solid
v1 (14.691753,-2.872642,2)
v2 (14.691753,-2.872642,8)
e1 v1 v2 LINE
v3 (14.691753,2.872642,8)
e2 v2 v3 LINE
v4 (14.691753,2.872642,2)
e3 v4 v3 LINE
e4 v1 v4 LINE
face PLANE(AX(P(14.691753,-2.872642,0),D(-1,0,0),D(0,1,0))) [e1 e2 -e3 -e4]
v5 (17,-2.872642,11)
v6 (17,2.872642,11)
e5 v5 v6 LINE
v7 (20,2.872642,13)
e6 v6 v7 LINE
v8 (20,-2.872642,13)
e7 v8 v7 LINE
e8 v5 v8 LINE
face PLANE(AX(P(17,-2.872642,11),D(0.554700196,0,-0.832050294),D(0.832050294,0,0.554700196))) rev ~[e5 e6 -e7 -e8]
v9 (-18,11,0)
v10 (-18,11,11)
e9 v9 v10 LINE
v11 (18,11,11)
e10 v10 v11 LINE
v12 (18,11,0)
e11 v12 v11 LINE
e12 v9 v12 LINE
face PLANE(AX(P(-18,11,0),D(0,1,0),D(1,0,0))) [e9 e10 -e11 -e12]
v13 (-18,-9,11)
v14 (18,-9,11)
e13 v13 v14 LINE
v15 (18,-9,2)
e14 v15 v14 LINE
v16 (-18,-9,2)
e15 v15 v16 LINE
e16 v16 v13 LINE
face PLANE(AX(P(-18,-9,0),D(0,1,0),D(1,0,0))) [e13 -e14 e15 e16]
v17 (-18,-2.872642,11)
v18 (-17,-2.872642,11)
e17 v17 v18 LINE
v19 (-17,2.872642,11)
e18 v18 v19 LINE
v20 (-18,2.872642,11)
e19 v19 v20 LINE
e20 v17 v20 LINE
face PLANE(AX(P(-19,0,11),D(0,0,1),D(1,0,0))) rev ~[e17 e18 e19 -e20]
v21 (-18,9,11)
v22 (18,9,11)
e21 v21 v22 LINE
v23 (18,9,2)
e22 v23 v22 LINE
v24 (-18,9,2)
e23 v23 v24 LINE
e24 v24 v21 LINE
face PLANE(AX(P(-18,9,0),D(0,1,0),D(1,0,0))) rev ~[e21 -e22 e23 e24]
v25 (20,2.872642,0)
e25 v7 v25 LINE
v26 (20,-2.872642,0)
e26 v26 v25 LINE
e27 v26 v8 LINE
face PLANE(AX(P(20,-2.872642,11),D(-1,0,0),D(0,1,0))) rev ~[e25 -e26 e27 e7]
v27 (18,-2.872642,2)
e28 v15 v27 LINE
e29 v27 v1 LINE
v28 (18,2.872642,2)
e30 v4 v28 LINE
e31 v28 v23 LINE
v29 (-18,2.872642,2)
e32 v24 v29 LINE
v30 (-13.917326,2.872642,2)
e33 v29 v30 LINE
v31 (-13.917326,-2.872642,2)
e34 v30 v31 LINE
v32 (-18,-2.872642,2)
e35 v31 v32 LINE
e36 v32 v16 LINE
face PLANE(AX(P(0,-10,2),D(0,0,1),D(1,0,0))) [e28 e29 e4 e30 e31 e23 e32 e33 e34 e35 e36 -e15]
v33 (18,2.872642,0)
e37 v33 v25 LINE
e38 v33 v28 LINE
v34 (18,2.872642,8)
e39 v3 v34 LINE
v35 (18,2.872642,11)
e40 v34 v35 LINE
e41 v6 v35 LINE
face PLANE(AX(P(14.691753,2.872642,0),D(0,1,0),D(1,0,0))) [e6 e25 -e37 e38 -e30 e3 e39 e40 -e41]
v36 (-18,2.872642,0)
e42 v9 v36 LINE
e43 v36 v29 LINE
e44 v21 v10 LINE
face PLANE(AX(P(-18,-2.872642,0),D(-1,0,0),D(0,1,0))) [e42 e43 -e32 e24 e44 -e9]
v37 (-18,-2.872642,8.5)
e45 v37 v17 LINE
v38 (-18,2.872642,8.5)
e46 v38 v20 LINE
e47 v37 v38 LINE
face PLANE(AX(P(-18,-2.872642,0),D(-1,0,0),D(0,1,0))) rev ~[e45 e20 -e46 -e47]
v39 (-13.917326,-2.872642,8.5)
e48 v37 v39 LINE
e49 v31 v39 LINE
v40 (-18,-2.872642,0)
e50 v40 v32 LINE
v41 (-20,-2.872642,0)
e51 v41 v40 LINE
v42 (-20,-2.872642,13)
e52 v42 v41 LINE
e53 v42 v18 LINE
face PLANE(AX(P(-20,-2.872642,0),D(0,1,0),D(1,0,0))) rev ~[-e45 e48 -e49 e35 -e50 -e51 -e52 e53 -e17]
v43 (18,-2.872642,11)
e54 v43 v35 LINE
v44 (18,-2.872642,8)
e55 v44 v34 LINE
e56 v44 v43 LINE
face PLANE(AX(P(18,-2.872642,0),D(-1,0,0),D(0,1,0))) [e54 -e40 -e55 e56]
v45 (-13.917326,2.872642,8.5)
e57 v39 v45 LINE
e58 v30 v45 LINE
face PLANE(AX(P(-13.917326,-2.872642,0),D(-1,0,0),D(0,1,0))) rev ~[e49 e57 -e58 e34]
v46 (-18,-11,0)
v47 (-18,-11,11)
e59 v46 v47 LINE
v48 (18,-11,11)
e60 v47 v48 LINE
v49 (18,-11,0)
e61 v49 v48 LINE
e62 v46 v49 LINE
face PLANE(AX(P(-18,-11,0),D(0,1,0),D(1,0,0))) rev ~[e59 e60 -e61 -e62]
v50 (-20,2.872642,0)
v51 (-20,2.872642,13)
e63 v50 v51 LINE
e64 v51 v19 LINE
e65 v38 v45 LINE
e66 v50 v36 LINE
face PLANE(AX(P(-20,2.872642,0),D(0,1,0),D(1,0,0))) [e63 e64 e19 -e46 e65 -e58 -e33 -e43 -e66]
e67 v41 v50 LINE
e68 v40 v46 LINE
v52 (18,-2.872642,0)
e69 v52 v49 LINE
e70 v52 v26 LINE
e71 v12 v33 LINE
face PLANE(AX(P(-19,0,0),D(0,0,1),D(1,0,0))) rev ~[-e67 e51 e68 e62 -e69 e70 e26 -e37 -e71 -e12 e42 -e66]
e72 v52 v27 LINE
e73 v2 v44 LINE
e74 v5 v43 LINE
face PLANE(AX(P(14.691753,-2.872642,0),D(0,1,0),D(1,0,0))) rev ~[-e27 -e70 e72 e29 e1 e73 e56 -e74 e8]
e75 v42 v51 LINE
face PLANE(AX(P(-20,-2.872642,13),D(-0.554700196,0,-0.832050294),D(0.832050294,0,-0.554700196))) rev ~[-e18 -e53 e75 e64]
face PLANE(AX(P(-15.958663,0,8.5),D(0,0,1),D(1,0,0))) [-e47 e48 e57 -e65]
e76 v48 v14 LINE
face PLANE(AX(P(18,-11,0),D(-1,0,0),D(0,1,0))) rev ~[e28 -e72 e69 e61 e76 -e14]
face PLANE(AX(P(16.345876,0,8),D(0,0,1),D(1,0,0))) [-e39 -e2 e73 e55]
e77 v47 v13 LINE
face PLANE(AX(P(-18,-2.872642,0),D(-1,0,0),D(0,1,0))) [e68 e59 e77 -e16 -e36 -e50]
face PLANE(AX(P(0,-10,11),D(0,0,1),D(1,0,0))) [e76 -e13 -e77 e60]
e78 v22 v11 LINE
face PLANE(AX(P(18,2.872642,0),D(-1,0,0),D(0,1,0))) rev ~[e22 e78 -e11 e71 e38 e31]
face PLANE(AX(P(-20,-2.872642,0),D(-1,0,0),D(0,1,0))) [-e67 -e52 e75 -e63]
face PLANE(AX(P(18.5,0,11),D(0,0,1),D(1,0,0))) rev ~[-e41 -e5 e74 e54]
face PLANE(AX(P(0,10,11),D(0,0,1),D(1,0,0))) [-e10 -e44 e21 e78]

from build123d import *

# Parameters (mm, degrees)
F0_W      = 36
F0_H      = 2
F1_DEPTH  = 2
F0_W_2    = 4.0826744884
F0_H_2    = 5.745283328
F2_DEPTH  = 8.5
F3_DEPTH  = 11
F0_W_3    = 2
F4_DEPTH  = 11
F5_W      = 3
F5_H      = 5.745283328
F5_W_2    = 2
F5_W_3    = 1
F6_DEPTH  = 2
F8_DEPTH  = 5.745283328
F10_DEPTH = 5.745283328
F0_W_4    = 3.3082471341
F11_DEPTH = 8


# Not quite as in the source:
# - a feature names something its author has since deleted; it is built from what else it names


with BuildPart() as f1:
    # F0 (on Top) → F1 (new body)
    with BuildSketch(Plane.XY):
        with Locations((0, -10)):
            Rectangle(F0_W, F0_H)
        Polygon((-18, -9), (18, -9), (18, -2.872641664), (14.6917528659, -2.872641664), (14.6917528659, 2.872641664), (18, 2.872641664), (18, 9), (-18, 9), (-18, 2.872641664), (-13.9173255116, 2.872641664), (-13.9173255116, -2.872641664), (-18, -2.872641664), align=None)
    extrude(amount=F1_DEPTH)

    # F0 (on Top) → F2 (join)
    with BuildSketch(Plane.XY):
        with Locations((-15.9586627558, 0)):
            Rectangle(F0_W_2, F0_H_2)
    extrude(amount=F2_DEPTH)

    # F0 (on Top) → F3 (join)
    with BuildSketch(Plane.XY):
        with Locations((0, -10)):
            Rectangle(F0_W, F0_H)
        with Locations((0, 10)):
            Rectangle(F0_W, F0_H)
    extrude(amount=F3_DEPTH)

    # F0 (on Top) → F4 (join)
    with BuildSketch(Plane.XY):
        with Locations((-19, 0)):
            Rectangle(F0_W_3, F0_H_2)
        with Locations((19, 0)):
            Rectangle(F0_W_3, F0_H_2)
    extrude(amount=F4_DEPTH)

    # F5 (on face) → F6 (join)
    with BuildSketch(Plane.XY.offset(11)):
        with Locations((18.5, 0)):
            Rectangle(F5_W, F5_H)
        with Locations((-19, 0)):
            Rectangle(F5_W_2, F5_H)
        with Locations((-17.5, 0)):
            Rectangle(F5_W_3, F5_H)
    extrude(amount=F6_DEPTH)

    # F7 (on face) → F8 (cut, through all)
    with BuildSketch(Plane.XZ.offset(2.872641664)):
        Polygon((-20, 13), (-17, 11), (-17, 13), align=None)
    extrude(amount=-F8_DEPTH, mode=Mode.SUBTRACT)

    # F9 (on face) → F10 (cut, through all)
    with BuildSketch(Plane.XZ.offset(2.872641664)):
        Polygon((17, 13), (17, 11), (20, 13), align=None)
    extrude(amount=-F10_DEPTH, mode=Mode.SUBTRACT)

    # F0 (on Top) → F11 (join)
    with BuildSketch(Plane.XY):
        with Locations((16.345876433, 0)):
            Rectangle(F0_W_4, F0_H_2)
    extrude(amount=F11_DEPTH)


solid = f1.part
